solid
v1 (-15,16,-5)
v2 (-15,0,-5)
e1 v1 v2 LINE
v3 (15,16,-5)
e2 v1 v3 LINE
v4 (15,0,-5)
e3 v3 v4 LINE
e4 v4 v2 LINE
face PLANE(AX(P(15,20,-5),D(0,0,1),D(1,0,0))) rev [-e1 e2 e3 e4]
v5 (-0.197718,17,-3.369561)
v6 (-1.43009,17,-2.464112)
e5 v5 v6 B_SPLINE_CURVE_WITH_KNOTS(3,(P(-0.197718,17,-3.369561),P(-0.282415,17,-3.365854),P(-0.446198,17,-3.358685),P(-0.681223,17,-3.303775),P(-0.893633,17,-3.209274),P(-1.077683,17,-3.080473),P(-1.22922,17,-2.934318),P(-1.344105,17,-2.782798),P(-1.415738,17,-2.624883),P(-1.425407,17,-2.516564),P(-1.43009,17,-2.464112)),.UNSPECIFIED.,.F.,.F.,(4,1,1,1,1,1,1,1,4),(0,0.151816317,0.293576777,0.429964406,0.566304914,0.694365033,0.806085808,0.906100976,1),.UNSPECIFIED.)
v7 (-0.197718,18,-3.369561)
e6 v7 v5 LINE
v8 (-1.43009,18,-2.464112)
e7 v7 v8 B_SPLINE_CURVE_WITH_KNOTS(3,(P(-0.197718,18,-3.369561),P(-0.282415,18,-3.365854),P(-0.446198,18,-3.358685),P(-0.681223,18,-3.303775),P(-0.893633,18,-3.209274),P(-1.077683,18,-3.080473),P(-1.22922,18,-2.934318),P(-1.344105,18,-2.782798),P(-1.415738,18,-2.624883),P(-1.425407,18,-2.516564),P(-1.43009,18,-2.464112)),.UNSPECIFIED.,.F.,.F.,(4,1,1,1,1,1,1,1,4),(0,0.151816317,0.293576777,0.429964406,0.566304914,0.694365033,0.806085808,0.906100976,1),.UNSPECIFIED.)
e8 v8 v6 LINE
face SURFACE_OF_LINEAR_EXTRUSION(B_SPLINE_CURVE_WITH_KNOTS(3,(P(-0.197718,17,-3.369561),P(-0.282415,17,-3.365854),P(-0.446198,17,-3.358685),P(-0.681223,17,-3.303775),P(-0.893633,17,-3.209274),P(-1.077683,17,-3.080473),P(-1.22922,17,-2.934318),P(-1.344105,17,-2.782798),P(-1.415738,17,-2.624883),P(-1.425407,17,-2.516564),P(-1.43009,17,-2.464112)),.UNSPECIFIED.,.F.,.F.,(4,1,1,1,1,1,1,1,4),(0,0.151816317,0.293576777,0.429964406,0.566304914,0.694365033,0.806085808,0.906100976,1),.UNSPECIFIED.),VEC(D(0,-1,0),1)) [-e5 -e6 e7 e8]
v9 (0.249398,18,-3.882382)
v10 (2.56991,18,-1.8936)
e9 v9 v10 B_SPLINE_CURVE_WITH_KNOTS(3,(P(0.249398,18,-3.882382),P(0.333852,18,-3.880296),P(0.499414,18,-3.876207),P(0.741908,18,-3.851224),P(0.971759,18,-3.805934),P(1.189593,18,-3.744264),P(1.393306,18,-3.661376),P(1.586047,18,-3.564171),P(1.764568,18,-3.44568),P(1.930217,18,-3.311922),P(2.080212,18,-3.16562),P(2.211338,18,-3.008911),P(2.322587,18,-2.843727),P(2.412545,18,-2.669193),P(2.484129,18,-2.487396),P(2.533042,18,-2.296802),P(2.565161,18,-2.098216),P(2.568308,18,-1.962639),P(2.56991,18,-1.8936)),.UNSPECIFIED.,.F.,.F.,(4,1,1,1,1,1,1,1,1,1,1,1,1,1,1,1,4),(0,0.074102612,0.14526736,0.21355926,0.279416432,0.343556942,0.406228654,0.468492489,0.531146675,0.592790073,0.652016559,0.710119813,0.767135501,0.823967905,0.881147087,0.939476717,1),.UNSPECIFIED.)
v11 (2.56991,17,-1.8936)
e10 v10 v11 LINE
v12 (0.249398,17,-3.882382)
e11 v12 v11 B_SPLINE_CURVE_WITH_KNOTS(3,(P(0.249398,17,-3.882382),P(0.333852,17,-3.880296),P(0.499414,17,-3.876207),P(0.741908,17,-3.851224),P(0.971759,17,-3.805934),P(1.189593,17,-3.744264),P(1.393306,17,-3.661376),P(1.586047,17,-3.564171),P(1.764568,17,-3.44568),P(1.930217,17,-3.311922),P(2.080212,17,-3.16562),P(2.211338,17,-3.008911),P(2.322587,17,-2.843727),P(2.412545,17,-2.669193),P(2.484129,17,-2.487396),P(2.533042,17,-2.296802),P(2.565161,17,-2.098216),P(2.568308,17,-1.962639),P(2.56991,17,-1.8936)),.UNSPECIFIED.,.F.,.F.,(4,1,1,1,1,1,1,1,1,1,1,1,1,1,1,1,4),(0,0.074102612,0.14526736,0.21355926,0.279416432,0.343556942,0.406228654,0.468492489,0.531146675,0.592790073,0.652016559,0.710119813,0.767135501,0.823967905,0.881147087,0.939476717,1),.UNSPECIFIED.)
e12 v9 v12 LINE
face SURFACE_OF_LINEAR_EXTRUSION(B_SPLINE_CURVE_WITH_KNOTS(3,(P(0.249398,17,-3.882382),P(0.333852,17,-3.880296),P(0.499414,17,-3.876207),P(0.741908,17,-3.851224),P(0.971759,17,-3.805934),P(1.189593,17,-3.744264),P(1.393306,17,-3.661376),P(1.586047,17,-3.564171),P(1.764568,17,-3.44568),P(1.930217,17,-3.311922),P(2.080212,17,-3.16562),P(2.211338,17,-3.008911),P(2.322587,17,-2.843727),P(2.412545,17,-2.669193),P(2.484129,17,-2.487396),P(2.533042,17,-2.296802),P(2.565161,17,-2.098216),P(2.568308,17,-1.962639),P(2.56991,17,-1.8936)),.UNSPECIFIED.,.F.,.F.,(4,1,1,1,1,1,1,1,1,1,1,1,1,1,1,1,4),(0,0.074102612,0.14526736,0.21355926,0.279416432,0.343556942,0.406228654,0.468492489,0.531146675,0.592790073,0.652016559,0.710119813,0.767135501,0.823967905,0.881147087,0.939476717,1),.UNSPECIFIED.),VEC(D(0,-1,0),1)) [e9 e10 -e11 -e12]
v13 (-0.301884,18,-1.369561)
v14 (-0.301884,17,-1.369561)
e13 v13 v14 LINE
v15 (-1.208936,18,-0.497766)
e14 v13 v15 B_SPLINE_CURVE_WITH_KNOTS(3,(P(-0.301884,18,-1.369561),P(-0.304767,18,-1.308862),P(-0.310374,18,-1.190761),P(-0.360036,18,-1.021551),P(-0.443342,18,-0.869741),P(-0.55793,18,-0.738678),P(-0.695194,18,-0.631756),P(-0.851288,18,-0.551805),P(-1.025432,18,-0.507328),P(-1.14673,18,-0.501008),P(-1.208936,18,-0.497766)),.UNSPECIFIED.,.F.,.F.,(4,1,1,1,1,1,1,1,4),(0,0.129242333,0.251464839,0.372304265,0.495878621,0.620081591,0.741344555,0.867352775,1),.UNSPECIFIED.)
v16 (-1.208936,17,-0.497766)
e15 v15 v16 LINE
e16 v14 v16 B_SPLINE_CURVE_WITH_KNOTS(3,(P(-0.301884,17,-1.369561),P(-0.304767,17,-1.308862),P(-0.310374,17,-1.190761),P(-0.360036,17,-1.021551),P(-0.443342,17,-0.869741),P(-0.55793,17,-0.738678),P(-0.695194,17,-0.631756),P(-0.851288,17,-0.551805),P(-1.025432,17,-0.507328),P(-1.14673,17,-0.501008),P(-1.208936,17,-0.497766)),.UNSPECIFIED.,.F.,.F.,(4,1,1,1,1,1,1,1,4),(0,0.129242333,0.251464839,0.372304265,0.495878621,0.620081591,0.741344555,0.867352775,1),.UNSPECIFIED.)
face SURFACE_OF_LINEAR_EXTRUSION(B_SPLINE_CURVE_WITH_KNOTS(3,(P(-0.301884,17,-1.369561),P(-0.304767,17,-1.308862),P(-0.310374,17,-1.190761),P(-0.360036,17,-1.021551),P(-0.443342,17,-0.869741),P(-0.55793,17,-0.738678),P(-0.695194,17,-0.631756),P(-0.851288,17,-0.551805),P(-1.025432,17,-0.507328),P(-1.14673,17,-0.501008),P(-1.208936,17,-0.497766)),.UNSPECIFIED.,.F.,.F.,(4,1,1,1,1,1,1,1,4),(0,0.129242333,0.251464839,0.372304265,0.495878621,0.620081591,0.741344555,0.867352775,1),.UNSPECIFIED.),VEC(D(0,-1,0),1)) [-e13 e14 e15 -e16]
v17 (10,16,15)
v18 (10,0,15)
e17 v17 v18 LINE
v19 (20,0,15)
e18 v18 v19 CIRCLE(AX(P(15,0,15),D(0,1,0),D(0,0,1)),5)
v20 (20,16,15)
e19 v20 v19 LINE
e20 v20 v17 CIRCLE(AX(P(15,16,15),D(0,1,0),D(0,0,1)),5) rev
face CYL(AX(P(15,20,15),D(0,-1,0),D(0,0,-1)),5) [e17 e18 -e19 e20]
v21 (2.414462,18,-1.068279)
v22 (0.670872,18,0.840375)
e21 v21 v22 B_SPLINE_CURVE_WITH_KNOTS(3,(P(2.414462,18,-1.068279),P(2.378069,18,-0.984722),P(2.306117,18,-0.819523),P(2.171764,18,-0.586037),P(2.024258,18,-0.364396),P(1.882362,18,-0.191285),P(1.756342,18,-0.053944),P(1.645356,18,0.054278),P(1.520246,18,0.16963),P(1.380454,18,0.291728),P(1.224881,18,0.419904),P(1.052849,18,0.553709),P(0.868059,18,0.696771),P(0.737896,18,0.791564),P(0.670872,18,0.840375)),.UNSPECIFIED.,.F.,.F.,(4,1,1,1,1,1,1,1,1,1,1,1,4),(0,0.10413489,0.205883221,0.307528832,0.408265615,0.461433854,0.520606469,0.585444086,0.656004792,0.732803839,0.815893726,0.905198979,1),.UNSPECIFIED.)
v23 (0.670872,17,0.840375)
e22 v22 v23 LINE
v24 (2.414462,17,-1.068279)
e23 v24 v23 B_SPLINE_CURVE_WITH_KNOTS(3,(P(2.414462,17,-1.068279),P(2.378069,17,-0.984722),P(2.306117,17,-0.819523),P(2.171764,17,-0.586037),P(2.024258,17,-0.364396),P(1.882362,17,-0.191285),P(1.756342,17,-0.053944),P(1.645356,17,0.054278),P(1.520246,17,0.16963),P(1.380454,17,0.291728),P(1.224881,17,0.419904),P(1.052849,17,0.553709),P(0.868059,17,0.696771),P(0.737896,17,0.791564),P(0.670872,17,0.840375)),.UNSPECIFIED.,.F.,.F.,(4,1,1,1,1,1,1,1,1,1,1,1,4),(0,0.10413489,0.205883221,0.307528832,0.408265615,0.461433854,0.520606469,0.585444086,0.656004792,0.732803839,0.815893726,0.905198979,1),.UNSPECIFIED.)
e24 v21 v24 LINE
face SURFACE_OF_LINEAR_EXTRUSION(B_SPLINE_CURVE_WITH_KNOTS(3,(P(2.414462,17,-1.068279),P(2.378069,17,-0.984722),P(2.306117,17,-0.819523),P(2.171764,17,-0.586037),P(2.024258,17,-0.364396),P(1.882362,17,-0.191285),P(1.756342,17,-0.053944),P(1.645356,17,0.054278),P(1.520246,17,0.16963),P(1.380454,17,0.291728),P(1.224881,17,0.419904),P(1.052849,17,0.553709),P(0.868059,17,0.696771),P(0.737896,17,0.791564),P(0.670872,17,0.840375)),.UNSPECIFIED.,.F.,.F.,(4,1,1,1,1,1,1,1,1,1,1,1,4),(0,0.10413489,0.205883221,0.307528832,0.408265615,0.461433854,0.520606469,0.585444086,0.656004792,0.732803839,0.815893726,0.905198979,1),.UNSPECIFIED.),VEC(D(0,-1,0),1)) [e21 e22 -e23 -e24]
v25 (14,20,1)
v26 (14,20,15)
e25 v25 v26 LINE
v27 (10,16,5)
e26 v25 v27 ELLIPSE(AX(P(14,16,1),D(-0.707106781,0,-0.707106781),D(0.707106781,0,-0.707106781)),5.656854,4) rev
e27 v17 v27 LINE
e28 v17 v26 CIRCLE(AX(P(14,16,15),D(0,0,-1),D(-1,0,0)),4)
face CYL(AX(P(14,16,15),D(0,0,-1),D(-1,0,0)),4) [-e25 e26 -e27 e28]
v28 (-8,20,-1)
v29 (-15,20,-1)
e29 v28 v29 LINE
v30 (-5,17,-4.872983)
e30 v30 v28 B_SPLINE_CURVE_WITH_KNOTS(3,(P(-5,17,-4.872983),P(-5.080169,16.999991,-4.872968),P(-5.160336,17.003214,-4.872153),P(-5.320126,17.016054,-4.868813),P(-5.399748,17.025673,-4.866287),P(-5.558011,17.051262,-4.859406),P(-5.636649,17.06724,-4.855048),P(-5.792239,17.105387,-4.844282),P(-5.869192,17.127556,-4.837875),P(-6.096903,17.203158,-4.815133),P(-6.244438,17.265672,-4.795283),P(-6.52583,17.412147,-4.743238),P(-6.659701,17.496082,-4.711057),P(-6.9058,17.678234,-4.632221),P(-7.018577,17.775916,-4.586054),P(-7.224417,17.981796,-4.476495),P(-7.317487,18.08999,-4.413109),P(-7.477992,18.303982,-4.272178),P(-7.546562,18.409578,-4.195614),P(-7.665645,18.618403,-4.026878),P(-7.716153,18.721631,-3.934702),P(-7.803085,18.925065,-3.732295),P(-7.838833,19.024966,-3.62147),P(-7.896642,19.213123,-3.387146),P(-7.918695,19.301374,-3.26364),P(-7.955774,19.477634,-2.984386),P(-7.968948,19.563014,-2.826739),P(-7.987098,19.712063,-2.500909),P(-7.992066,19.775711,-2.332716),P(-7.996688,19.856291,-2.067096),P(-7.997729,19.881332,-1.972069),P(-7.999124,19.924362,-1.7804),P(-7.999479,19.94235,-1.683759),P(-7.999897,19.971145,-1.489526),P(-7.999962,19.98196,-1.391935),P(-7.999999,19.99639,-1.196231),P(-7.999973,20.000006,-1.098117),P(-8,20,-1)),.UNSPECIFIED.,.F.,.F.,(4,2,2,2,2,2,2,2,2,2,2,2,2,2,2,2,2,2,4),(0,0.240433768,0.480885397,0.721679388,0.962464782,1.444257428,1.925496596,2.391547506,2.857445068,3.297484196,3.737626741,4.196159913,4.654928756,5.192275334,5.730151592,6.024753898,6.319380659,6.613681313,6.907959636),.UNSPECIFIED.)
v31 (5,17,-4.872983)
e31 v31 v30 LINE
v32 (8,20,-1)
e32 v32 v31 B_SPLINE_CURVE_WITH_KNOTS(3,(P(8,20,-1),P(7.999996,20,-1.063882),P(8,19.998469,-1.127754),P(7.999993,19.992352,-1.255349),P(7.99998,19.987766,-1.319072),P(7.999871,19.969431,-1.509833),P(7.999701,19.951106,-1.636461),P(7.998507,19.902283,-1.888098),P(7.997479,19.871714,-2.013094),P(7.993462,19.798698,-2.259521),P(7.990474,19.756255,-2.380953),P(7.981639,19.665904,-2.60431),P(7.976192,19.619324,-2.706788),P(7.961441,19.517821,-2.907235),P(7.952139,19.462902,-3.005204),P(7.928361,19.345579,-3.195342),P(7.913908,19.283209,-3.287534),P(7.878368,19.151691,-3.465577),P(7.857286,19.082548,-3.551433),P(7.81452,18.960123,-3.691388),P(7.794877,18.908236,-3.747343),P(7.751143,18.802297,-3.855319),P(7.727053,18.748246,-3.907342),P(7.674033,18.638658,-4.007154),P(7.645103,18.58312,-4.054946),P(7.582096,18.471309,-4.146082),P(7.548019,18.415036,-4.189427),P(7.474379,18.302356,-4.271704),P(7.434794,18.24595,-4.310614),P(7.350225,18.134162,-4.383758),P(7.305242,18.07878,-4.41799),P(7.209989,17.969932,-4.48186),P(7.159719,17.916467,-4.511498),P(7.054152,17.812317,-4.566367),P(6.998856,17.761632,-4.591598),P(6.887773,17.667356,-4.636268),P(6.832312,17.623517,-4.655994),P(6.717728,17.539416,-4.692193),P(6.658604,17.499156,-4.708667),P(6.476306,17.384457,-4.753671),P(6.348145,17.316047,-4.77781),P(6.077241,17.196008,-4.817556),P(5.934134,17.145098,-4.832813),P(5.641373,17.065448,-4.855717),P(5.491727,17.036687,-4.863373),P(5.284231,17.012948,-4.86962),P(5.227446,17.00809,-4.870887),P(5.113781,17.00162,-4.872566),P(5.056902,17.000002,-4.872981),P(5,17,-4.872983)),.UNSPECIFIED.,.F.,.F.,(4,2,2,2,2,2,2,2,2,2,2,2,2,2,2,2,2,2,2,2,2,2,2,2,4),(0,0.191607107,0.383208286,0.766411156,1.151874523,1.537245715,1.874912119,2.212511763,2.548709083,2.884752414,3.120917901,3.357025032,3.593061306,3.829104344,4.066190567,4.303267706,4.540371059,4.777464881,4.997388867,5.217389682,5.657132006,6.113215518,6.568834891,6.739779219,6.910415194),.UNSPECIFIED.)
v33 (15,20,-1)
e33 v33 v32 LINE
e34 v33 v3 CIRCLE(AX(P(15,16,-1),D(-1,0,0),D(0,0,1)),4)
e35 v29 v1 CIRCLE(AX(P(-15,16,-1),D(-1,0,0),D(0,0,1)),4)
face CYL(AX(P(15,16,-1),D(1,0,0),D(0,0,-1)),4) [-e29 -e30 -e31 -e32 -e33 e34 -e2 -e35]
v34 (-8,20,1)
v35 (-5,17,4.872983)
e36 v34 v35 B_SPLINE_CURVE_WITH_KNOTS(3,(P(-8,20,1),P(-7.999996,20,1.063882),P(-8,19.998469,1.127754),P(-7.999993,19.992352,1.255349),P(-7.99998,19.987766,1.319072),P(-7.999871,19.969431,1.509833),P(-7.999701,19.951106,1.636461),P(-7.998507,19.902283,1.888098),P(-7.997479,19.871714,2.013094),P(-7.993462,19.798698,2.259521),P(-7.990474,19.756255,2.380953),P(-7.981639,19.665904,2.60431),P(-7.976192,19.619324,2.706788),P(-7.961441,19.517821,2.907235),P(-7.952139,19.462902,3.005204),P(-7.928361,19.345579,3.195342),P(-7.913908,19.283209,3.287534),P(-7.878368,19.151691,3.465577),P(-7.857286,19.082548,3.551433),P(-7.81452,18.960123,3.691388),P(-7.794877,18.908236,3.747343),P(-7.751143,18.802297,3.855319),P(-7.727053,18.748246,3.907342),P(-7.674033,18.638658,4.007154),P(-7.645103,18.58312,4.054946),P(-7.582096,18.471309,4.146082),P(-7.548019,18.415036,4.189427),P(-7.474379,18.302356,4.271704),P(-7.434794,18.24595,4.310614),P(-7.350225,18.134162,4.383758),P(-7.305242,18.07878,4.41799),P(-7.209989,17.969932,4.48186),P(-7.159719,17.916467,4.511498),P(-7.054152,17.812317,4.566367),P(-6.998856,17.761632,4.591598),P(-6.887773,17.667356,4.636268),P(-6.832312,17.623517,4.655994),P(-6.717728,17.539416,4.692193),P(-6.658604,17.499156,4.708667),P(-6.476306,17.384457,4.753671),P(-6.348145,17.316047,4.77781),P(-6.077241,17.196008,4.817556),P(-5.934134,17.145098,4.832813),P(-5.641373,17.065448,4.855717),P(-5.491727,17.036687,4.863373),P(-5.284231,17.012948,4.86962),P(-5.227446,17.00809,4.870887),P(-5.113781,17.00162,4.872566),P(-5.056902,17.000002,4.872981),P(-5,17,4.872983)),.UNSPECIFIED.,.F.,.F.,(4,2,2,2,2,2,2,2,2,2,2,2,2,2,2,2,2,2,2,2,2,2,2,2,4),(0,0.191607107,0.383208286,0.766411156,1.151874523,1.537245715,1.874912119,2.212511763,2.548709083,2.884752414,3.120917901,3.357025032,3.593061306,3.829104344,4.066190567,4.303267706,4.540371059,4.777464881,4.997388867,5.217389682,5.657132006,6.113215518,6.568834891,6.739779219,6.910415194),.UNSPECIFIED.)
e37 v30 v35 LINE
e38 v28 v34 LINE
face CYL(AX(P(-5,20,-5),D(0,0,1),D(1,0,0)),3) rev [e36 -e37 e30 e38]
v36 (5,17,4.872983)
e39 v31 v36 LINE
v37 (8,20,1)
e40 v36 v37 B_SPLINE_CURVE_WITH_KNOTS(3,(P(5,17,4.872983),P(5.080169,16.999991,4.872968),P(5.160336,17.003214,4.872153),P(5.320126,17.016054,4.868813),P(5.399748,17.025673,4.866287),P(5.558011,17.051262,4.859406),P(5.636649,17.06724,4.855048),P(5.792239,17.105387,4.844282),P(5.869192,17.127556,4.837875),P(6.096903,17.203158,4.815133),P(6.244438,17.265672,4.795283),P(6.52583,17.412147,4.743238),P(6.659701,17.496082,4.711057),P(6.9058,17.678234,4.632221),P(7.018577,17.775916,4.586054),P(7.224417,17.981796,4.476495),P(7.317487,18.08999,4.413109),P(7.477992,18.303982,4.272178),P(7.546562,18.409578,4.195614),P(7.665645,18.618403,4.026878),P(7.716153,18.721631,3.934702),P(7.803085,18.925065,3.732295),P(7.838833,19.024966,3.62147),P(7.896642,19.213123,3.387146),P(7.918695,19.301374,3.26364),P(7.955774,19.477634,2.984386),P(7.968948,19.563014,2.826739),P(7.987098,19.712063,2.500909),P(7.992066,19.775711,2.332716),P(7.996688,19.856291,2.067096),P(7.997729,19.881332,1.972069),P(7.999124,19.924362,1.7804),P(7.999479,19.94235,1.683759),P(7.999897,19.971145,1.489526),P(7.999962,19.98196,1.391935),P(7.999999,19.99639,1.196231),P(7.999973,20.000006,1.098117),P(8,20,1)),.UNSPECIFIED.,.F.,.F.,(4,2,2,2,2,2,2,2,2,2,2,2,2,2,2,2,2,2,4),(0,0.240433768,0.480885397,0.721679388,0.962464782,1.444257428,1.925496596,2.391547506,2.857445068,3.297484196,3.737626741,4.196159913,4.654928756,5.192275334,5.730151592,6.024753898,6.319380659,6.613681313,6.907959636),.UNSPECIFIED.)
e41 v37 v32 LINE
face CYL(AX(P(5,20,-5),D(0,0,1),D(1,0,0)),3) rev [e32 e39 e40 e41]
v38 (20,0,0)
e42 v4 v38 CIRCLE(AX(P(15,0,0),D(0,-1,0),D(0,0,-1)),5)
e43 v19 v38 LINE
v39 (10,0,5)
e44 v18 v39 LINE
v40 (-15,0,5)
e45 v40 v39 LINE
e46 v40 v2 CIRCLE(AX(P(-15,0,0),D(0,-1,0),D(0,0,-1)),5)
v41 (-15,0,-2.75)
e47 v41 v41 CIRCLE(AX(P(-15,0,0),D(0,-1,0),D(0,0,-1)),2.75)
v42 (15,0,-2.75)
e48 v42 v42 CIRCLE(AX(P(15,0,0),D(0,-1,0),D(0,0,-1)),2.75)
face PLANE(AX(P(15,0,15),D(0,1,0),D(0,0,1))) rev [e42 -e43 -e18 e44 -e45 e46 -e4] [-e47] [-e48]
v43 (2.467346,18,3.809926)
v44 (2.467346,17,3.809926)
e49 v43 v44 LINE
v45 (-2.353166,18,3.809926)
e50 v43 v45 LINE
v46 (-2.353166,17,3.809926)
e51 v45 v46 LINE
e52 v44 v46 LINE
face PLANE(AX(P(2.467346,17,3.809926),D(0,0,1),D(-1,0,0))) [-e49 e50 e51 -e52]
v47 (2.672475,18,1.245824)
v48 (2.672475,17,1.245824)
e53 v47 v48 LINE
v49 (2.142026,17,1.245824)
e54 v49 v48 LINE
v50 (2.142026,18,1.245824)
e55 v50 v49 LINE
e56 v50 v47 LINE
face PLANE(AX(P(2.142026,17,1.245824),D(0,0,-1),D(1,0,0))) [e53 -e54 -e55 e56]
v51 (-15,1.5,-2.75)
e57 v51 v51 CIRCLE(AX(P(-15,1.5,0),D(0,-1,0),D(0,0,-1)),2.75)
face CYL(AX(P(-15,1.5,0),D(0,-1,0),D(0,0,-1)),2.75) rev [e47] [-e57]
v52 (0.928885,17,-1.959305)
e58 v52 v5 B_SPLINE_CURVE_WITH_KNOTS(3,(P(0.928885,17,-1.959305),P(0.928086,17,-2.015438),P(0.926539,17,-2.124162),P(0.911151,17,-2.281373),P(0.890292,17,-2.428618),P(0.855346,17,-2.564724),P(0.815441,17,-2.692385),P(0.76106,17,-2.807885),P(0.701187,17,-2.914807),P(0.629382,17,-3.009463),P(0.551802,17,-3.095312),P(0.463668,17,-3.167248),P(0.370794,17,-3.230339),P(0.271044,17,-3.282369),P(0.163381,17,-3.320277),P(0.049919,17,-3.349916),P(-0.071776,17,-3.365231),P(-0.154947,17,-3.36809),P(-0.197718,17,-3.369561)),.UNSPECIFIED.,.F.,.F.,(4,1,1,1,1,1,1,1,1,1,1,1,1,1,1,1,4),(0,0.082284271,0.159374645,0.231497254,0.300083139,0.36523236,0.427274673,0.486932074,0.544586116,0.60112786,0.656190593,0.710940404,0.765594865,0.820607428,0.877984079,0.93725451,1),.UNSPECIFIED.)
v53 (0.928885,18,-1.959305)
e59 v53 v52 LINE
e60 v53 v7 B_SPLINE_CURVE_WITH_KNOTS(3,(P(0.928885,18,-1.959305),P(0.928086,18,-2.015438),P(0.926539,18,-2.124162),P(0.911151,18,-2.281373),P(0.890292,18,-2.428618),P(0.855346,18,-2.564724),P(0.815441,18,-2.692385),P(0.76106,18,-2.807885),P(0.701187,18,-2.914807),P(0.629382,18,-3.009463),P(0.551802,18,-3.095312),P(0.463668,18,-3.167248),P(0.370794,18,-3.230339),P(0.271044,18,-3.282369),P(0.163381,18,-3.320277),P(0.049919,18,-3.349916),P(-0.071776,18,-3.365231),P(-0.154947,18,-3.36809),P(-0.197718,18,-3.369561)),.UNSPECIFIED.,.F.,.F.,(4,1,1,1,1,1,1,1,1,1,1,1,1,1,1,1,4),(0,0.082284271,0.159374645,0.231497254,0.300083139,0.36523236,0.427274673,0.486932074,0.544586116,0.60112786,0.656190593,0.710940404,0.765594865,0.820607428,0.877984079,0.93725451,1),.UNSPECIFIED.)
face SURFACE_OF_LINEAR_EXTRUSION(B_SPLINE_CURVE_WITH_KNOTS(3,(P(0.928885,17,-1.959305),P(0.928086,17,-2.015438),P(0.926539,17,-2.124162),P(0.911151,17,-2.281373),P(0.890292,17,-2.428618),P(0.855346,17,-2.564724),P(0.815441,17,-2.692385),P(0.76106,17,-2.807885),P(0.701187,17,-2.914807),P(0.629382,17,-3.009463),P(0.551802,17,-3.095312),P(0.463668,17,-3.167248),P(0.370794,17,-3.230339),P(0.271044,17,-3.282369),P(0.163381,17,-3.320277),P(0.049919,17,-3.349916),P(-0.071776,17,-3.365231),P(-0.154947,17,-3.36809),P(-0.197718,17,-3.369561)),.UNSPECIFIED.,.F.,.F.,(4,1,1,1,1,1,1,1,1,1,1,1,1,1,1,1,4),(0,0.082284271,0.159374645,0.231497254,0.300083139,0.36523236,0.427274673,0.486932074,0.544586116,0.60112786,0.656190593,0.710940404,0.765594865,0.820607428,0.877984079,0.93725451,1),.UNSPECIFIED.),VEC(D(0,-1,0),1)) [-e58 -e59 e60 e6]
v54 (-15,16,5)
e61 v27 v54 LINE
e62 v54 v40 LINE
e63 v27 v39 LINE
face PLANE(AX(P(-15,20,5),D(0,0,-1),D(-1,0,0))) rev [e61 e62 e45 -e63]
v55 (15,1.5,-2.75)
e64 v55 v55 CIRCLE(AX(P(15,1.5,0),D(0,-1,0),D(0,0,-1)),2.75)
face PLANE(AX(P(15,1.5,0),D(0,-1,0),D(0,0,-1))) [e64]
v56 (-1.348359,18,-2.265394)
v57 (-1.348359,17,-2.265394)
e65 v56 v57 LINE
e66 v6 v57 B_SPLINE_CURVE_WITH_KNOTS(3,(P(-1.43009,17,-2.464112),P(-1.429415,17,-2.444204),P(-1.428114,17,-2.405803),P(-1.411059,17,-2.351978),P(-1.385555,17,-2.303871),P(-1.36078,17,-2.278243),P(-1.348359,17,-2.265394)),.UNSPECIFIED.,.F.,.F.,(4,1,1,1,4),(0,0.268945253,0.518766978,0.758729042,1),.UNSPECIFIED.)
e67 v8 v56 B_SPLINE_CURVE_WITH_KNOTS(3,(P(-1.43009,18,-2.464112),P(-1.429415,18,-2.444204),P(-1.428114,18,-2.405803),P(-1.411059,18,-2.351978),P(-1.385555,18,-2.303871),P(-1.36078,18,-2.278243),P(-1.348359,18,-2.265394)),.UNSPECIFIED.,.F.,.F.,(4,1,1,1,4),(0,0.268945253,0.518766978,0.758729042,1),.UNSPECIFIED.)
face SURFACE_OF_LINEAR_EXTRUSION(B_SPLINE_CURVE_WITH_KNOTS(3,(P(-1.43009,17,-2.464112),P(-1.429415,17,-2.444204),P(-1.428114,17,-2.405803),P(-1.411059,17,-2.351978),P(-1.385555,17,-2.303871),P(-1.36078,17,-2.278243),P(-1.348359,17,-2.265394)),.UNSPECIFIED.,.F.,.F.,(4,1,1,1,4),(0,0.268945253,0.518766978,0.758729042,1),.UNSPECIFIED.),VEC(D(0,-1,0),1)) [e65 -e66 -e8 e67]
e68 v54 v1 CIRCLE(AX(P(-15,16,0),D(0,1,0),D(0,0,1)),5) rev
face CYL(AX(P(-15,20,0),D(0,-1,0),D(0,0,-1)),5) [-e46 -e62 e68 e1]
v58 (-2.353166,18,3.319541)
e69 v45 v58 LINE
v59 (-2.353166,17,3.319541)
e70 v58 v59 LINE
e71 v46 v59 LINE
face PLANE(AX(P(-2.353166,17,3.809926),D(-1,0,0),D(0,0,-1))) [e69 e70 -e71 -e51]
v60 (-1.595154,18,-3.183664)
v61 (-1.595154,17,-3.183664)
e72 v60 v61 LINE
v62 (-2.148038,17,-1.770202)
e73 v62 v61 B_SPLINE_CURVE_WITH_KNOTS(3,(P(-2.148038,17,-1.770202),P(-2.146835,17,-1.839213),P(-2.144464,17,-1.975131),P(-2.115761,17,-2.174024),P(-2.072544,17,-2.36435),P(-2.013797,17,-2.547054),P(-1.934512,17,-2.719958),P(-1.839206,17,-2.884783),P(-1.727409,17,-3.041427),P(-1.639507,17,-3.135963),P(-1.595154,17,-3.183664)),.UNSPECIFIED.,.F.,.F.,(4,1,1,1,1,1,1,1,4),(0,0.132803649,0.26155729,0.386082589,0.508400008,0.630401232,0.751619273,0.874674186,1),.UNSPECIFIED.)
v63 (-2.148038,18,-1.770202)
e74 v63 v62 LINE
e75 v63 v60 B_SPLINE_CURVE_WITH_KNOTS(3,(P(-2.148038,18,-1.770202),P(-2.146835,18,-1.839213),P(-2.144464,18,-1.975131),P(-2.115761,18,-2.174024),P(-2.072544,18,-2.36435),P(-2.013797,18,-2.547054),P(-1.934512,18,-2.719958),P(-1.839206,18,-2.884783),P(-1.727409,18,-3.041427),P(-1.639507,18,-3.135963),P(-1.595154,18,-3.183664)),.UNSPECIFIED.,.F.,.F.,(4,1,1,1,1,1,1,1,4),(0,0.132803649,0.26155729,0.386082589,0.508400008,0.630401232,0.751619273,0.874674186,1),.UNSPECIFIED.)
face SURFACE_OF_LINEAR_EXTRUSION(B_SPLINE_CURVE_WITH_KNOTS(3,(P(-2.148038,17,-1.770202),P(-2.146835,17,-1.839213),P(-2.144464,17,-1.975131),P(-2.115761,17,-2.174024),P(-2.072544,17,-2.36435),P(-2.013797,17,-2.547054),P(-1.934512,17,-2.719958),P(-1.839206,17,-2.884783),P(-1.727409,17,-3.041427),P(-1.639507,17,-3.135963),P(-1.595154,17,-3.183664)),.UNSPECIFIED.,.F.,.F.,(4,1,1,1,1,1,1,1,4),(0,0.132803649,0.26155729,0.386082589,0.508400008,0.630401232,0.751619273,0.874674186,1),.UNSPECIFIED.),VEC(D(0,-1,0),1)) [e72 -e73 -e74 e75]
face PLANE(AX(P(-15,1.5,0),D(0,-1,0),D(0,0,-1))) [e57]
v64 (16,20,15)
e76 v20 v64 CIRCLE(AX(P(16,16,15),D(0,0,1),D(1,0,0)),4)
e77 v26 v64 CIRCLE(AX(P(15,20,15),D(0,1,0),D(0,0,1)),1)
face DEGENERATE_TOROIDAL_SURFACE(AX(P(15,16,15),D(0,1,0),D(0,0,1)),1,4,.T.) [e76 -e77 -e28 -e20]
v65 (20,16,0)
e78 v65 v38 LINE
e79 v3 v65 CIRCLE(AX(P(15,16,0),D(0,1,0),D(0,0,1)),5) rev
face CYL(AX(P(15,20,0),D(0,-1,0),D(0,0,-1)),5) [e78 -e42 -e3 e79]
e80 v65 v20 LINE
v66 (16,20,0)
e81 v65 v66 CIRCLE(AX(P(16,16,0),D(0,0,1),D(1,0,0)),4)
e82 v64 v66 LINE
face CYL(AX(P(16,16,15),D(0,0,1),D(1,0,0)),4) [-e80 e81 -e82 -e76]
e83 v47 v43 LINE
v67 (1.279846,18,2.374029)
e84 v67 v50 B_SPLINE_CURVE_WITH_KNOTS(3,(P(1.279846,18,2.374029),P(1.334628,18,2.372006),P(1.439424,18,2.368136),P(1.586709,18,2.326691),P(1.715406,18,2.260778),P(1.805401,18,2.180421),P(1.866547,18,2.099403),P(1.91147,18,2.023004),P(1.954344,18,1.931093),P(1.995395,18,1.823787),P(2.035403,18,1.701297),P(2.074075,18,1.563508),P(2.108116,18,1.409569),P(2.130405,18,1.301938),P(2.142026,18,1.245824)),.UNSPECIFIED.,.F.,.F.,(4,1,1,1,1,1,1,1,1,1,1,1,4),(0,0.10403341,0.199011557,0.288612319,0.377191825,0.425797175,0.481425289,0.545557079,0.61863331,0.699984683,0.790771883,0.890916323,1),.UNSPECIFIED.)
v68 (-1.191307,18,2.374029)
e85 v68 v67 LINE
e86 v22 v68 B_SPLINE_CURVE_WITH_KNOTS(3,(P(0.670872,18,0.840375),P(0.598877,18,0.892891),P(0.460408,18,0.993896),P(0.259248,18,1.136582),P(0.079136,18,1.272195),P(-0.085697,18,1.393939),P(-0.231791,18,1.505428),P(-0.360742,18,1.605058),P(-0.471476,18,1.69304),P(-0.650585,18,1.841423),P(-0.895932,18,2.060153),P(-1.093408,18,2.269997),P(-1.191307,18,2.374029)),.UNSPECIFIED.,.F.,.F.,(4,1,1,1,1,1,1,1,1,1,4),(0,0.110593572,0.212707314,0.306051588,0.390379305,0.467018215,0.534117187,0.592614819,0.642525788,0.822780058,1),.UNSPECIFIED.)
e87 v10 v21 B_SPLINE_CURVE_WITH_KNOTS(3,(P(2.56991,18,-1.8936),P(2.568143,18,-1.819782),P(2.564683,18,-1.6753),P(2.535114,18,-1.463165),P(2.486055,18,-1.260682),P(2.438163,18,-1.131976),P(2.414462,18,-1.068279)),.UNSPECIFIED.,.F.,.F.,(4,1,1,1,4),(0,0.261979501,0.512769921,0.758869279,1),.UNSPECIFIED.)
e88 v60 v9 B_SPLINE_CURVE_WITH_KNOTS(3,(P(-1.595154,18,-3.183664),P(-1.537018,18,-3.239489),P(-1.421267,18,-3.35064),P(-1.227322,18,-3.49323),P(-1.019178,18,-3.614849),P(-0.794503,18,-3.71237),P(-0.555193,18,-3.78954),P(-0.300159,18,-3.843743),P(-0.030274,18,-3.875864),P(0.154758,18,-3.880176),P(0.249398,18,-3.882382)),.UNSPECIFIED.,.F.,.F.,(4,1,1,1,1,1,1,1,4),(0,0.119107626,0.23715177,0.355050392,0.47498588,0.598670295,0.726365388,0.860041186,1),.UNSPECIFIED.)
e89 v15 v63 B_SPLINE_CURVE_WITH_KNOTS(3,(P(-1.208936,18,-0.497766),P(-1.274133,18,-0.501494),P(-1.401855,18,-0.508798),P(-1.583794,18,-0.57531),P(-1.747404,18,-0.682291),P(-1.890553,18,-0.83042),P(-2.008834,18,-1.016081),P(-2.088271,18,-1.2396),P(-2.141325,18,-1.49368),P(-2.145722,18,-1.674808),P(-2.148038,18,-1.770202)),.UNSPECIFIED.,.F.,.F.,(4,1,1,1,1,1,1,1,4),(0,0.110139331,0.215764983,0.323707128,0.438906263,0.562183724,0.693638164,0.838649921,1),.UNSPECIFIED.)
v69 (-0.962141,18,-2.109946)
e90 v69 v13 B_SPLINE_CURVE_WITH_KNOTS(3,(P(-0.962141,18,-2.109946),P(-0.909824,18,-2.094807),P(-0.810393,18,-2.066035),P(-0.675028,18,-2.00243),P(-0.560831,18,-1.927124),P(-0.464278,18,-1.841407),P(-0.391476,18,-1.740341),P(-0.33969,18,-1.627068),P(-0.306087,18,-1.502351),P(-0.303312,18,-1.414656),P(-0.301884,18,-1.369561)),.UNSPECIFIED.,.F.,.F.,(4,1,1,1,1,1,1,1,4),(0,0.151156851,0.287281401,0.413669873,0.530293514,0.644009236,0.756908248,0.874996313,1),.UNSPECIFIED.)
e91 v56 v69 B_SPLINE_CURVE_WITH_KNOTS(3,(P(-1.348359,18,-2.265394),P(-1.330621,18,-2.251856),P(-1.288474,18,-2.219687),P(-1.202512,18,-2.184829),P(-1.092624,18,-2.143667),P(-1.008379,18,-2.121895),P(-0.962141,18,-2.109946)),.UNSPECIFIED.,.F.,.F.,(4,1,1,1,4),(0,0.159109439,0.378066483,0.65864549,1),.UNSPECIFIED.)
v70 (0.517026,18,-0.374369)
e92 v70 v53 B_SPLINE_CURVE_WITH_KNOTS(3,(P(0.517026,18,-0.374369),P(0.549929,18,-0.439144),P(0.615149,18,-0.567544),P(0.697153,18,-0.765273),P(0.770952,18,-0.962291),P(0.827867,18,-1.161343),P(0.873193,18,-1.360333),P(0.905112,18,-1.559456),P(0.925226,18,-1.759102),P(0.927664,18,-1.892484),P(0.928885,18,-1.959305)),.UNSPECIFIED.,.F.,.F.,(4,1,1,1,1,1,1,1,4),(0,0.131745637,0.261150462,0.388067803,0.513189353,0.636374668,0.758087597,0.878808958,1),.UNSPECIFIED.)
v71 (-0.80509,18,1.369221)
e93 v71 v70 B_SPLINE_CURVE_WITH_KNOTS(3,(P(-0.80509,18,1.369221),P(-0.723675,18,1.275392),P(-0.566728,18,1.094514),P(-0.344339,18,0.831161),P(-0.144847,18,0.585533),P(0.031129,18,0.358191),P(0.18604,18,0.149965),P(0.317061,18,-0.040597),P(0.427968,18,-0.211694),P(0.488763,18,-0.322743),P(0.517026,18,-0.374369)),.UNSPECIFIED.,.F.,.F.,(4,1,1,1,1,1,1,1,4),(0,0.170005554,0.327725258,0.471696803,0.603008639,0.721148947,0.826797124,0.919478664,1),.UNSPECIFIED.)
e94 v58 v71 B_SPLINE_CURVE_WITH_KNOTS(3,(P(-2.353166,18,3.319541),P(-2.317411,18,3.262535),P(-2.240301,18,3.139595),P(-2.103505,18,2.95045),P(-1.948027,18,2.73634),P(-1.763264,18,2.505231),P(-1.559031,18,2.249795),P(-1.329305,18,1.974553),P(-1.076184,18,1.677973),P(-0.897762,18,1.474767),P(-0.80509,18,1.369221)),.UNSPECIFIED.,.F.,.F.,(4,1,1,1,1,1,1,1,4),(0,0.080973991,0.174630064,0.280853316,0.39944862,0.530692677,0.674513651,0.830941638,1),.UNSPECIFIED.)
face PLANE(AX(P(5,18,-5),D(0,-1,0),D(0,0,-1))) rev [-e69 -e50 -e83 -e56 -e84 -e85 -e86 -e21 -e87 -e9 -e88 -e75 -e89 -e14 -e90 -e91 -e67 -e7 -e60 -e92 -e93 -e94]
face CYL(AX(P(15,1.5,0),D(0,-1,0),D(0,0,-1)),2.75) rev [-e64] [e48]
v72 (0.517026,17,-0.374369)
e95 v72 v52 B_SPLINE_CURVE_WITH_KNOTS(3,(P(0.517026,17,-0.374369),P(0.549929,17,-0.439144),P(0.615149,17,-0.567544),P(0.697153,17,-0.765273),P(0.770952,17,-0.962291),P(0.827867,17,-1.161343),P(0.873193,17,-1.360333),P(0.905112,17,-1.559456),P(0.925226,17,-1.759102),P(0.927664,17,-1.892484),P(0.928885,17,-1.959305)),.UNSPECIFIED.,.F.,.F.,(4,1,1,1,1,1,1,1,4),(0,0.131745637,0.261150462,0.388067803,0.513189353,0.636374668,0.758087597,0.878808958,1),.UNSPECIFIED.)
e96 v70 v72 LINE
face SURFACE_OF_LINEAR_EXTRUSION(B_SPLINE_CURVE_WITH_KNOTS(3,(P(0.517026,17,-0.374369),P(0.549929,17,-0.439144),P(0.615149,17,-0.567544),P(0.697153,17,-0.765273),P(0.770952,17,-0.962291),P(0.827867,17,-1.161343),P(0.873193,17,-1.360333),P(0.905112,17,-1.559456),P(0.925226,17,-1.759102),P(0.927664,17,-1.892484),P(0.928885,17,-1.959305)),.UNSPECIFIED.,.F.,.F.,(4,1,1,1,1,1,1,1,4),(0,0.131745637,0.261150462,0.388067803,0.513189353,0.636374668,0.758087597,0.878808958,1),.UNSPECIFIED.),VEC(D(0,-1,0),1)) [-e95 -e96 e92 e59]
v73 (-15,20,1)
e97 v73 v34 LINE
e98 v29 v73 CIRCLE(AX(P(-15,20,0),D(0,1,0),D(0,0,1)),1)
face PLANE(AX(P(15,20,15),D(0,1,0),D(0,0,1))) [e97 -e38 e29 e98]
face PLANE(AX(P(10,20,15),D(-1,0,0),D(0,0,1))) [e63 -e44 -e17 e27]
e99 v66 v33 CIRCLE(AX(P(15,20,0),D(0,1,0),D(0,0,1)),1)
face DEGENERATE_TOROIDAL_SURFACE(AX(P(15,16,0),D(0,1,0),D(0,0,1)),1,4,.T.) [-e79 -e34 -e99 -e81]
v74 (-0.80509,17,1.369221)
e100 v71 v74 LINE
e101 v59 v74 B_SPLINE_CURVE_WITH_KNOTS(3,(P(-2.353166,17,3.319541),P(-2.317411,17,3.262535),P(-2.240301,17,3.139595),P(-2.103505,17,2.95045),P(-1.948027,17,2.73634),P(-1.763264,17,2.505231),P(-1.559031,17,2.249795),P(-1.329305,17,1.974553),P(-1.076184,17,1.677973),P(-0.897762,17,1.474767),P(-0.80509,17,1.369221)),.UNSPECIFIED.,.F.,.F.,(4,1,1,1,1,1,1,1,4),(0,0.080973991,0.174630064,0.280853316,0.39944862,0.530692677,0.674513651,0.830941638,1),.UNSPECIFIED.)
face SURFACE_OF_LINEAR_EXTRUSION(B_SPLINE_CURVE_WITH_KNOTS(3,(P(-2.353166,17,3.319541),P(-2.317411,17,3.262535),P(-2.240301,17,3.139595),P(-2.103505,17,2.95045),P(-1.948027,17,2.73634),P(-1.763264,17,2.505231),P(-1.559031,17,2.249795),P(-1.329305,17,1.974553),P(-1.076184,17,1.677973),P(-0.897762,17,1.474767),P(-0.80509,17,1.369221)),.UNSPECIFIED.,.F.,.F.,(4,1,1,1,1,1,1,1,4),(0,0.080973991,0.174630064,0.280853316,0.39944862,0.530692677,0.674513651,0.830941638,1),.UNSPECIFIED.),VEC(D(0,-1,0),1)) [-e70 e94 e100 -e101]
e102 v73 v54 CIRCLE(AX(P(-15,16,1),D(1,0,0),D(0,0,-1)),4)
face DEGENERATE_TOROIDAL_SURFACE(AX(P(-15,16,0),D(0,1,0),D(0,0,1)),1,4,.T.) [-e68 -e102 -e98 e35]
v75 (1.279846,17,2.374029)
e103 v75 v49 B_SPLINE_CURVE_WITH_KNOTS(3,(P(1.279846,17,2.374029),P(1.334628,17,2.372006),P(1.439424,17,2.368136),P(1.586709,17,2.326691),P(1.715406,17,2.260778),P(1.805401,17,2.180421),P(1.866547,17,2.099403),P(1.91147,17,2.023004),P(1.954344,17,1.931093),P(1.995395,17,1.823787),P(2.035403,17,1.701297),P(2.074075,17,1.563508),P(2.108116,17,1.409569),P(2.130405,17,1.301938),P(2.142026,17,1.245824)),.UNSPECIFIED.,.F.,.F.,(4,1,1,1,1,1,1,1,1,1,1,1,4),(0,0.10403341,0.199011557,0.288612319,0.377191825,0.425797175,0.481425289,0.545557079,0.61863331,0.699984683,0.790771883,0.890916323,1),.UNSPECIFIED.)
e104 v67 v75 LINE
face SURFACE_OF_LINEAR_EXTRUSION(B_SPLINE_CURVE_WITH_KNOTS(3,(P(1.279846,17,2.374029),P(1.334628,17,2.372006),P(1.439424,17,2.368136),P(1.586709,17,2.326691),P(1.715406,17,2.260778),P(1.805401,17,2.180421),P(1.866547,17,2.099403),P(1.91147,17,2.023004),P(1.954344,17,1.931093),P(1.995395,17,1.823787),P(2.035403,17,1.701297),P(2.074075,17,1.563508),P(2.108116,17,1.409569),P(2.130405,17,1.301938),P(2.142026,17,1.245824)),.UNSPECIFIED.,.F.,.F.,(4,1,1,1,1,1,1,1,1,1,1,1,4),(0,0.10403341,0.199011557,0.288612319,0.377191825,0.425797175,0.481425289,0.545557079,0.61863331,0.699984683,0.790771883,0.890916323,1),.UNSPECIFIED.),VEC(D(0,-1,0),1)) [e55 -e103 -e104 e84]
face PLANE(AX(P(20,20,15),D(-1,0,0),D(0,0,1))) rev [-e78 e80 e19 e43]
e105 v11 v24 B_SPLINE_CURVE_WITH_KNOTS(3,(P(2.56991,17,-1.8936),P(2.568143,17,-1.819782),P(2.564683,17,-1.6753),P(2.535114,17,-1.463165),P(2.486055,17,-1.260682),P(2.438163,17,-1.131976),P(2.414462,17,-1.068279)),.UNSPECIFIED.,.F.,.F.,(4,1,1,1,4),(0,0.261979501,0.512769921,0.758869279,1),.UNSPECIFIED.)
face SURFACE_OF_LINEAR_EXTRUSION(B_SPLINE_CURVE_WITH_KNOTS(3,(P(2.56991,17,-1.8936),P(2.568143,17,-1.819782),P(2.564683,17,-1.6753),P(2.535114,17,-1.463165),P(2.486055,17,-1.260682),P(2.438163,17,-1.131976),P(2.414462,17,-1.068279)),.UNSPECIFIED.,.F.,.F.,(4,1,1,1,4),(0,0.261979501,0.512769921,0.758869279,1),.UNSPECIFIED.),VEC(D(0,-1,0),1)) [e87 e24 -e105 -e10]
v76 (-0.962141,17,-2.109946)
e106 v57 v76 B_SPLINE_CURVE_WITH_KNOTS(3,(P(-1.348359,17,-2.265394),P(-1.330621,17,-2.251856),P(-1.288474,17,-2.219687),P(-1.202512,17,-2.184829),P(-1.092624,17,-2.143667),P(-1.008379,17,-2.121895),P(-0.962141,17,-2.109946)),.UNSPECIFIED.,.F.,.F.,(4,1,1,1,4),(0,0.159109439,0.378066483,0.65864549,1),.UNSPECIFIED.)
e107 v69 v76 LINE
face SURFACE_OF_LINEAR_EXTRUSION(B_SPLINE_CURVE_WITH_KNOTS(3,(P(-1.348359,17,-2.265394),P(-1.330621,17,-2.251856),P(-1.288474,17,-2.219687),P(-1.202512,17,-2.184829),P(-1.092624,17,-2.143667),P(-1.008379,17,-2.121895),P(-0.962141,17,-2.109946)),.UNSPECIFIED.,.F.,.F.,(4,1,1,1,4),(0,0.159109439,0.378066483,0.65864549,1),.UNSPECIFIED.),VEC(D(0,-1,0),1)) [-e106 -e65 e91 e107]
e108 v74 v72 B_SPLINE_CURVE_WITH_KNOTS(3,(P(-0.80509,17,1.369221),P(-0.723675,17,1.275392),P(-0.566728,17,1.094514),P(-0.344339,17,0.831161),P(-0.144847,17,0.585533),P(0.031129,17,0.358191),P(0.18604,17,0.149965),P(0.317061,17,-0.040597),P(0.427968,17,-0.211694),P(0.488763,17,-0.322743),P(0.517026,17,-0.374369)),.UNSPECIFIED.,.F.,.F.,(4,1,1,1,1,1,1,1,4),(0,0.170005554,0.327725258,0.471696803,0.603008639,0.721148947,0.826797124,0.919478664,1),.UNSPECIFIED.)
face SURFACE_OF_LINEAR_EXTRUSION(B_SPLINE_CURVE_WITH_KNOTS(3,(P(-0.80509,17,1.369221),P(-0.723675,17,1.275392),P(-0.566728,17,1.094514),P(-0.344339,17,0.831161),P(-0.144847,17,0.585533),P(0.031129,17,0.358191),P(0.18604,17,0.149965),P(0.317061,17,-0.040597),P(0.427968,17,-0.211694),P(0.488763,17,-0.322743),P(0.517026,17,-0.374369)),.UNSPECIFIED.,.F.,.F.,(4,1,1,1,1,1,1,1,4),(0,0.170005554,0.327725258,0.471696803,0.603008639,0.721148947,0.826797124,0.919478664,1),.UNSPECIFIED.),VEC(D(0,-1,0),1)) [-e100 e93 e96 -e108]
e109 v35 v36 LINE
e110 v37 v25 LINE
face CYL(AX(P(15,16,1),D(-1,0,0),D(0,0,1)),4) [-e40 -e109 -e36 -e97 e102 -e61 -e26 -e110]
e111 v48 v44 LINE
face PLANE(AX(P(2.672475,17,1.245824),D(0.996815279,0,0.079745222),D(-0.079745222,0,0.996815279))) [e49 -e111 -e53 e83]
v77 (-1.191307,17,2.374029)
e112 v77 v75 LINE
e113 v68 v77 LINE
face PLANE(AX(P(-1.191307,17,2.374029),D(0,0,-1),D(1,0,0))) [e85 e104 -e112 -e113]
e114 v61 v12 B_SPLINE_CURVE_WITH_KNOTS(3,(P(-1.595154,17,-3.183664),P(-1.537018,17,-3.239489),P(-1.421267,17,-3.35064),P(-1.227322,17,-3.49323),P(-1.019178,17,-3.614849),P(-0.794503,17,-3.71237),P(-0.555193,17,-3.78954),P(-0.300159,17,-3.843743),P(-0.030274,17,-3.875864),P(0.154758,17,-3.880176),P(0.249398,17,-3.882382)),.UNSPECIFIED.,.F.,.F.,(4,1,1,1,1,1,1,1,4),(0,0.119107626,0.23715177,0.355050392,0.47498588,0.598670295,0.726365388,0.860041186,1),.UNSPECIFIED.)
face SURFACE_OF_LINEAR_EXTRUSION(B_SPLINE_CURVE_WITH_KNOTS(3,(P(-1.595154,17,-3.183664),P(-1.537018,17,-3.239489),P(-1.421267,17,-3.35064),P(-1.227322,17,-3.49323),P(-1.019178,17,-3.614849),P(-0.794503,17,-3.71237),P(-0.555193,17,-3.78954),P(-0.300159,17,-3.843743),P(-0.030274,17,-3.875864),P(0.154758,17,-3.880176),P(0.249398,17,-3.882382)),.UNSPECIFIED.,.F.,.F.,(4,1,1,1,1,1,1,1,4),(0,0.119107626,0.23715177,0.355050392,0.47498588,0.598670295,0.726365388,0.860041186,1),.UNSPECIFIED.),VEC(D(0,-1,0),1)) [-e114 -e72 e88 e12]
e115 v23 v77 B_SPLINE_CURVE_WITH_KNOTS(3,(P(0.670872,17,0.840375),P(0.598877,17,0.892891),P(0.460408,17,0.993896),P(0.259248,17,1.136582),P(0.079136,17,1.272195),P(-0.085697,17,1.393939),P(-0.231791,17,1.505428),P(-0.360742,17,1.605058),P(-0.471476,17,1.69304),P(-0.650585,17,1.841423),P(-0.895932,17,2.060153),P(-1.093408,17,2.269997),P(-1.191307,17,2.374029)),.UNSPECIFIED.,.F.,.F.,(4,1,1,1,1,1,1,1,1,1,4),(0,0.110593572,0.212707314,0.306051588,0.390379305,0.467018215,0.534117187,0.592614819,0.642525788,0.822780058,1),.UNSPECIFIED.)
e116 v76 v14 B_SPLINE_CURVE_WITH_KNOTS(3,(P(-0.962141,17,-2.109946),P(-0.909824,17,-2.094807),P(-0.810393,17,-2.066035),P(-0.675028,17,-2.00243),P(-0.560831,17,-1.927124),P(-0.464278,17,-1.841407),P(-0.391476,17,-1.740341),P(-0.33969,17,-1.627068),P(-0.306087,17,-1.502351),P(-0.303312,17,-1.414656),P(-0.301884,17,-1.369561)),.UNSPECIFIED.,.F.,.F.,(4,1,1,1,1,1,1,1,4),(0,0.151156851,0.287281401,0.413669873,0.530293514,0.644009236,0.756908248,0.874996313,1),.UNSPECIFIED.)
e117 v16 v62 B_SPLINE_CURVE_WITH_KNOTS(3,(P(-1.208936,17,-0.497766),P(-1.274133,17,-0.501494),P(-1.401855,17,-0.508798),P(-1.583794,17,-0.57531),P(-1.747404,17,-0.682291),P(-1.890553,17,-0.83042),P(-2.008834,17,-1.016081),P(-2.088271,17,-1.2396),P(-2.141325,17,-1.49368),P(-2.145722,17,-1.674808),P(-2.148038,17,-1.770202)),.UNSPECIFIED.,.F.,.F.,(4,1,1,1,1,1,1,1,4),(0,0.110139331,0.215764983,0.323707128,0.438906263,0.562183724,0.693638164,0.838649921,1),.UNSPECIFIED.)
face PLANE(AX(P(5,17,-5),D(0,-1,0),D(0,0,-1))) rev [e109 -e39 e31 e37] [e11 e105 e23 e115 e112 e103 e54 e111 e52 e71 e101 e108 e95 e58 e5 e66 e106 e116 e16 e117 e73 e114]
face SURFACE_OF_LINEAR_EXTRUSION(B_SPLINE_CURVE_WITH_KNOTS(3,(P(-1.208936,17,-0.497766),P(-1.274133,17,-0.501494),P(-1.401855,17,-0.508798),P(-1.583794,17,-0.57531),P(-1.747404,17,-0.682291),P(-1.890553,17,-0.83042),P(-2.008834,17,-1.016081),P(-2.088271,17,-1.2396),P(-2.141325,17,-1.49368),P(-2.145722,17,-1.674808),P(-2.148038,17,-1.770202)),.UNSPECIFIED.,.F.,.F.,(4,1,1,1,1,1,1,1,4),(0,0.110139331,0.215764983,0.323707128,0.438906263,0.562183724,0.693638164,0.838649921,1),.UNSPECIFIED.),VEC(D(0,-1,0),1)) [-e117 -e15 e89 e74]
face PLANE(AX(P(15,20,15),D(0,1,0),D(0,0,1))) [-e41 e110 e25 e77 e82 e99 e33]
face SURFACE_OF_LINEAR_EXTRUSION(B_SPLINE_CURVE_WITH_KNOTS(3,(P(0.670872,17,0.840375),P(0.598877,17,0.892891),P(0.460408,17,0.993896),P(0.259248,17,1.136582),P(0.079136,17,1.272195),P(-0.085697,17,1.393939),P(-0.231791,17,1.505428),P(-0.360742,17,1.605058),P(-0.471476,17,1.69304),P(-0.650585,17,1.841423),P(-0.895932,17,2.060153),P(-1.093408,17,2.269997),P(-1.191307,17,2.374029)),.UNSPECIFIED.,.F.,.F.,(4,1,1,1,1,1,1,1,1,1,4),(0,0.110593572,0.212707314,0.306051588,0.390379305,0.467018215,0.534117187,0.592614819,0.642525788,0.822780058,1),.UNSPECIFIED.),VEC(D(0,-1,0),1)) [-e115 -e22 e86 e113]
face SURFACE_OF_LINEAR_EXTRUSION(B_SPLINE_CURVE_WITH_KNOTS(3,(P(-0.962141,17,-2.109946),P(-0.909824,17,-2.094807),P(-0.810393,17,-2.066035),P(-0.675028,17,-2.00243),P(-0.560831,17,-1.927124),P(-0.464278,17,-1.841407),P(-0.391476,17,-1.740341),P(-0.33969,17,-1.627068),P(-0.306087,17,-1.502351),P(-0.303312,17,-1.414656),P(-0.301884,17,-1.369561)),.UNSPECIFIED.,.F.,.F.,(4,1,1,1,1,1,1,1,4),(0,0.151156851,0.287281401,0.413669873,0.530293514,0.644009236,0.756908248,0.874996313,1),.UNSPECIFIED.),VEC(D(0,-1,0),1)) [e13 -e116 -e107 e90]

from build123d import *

# Parameters (mm, degrees)
BOSS_EXTRUDE1_DEPTH     = 20
FILLET1_R               = 4
SKETCH2_R               = 2.75
CUT_EXTRUDE1_DEPTH      = 1.5
LPATTERN1_COUNT         = 2
LPATTERN1_PITCH         = 30
CUT_EXTRUDE2_DEPTH      = 35.641016151
CUT_EXTRUDE2_DEPTH_BACK = 35.641016151
WRAP1_DEPTH             = 1


# Read off the part's stored shape, not the designer's step: Wrap1
with BuildPart() as part:
    # Sketch1 → Boss-Extrude1 (new body)
    with BuildSketch(Plane(origin=(0, 0, 0), x_dir=(1, 0, 0), z_dir=(0, 1, 0))):
        with BuildLine():
            Line((-15, -5), (10, -5))
            Line((10, -5), (10, -15))
            ThreePointArc((10, -15), (15, -20), (20, -15))
            Line((20, -15), (20, 0))
            ThreePointArc((20, 0), (18.535533906, 3.535533906), (15, 5))
            Line((15, 5), (-15, 5))
            ThreePointArc((-15, 5), (-20, 0), (-15, -5))
        make_face()
    extrude(amount=BOSS_EXTRUDE1_DEPTH)

    # Fillet1
    fillet1_edges = [part.edges().sort_by_distance(p)[0] for p in [
        (15, 20, 20),
        (20, 20, 7.5),
        (18.535533906, 20, -3.535533906),
        (0, 20, -5),
        (-20, 20, 0),
        (-2.5, 20, 5),
        (10, 20, 10),
    ]]
    fillet(fillet1_edges, radius=FILLET1_R)

    # Sketch2 → Cut-Extrude1 (cut)
    with BuildSketch(Plane.XZ):
        with Locations(Location((-15, 0, 0), (0, 0, 270))):
            Circle(SKETCH2_R)
    cut_extrude1 = extrude(amount=-CUT_EXTRUDE1_DEPTH, mode=Mode.SUBTRACT)

    # LPattern1: Cut-Extrude1 ×2
    with Locations(*[(i * LPATTERN1_PITCH, 0, 0) for i in range(1, LPATTERN1_COUNT)]):
        add(cut_extrude1, mode=Mode.SUBTRACT)

    # Sketch3 → Cut-Extrude2 (cut, two sides: drawn at the far end of the back side and taken through both)
    with BuildSketch(Plane.XY.offset(-CUT_EXTRUDE2_DEPTH_BACK)):
        with BuildLine():
            Line((5, 17), (-5, 17))
            ThreePointArc((-5, 17), (-8, 20), (-5, 23))
            Line((-5, 23), (5, 23))
            ThreePointArc((5, 23), (8, 20), (5, 17))
        make_face()
    extrude(amount=CUT_EXTRUDE2_DEPTH + CUT_EXTRUDE2_DEPTH_BACK, mode=Mode.SUBTRACT)

    # Wrap1 outline → Wrap1 (add)
    with BuildSketch(Plane(origin=(0, 17, 0), x_dir=(1, 0, 0), z_dir=(0, 1, 0))):
        with BuildLine():
            add(Edge.make_bspline(
                [(1.279846376, -2.374028678), (1.334628235, -2.372005919), (1.439423638, -2.368136466), (1.586709387, -2.326690884), (1.715405832, -2.260778282), (1.805401117, -2.180421216), (1.866547055, -2.099402851), (1.91146986, -2.023004422), (1.954343809, -1.931092566), (1.995394653, -1.823787438), (2.03540343, -1.701296934), (2.074075054, -1.563508285), (2.108116131, -1.409568974), (2.130405187, -1.301938193), (2.142025864, -1.245823549)],
                knots=[0, 0, 0, 0, 0.10403341, 0.199011557, 0.288612319, 0.377191825, 0.425797175, 0.481425289, 0.545557079, 0.61863331, 0.699984683, 0.790771883, 0.890916323, 1, 1, 1, 1], degree=3))
            Line((1.279846376, -2.374028678), (-1.19130747, -2.374028678))
            add(Edge.make_bspline(
                [(0.670872017, -0.840374831), (0.598877184, -0.892890897), (0.460407765, -0.993896327), (0.259247648, -1.136582046), (0.079136214, -1.2721954), (-0.085697103, -1.393939001), (-0.231791362, -1.50542791), (-0.360742391, -1.605057789), (-0.471476435, -1.693040171), (-0.650584686, -1.841423278), (-0.895932385, -2.060152678), (-1.093407848, -2.269997081), (-1.19130747, -2.374028678)],
                knots=[0, 0, 0, 0, 0.110593572, 0.212707314, 0.306051588, 0.390379305, 0.467018215, 0.534117187, 0.592614819, 0.642525788, 0.822780058, 1, 1, 1, 1], degree=3))
            add(Edge.make_bspline(
                [(2.414461761, 1.068279015), (2.378068935, 0.984722167), (2.306117333, 0.819523423), (2.171764082, 0.586037142), (2.024257932, 0.364395962), (1.882362056, 0.191285153), (1.756342108, 0.053944192), (1.645356158, -0.054277839), (1.52024596, -0.169630314), (1.380454268, -0.29172845), (1.224880603, -0.419904333), (1.052848506, -0.553709461), (0.868059484, -0.696771215), (0.737896342, -0.79156374), (0.670872017, -0.840374831)],
                knots=[0, 0, 0, 0, 0.10413489, 0.205883221, 0.307528832, 0.408265615, 0.461433854, 0.520606469, 0.585444086, 0.656004792, 0.732803839, 0.815893726, 0.905198979, 1, 1, 1, 1], degree=3))
            add(Edge.make_bspline(
                [(2.569910479, 1.893599528), (2.568142746, 1.81978224), (2.56468278, 1.675300383), (2.535113724, 1.46316539), (2.486055205, 1.260681768), (2.438163447, 1.131975763), (2.414461761, 1.068279015)],
                knots=[0, 0, 0, 0, 0.261979501, 0.512769921, 0.758869279, 1, 1, 1, 1], degree=3))
            add(Edge.make_bspline(
                [(0.249397658, 3.882381579), (0.333852401, 3.880295856), (0.499413602, 3.876207099), (0.741908223, 3.851223526), (0.971759136, 3.80593405), (1.18959295, 3.744264137), (1.393306246, 3.661376278), (1.586046869, 3.564171248), (1.76456817, 3.445680325), (1.930217215, 3.311921517), (2.08021151, 3.165619914), (2.21133761, 3.008910571), (2.322587283, 2.843726724), (2.412544984, 2.66919338), (2.484129314, 2.487396013), (2.533041577, 2.296802227), (2.565160525, 2.098215825), (2.568307798, 1.962639068), (2.569910479, 1.893599528)],
                knots=[0, 0, 0, 0, 0.074102612, 0.14526736, 0.21355926, 0.279416432, 0.343556942, 0.406228654, 0.468492489, 0.531146675, 0.592790073, 0.652016559, 0.710119813, 0.767135501, 0.823967905, 0.881147087, 0.939476717, 1, 1, 1, 1], degree=3))
            add(Edge.make_bspline(
                [(-1.595153624, 3.18366363), (-1.537018416, 3.239488538), (-1.421267077, 3.350639908), (-1.227322021, 3.49323037), (-1.01917847, 3.614849236), (-0.794503481, 3.712369576), (-0.555192573, 3.789539817), (-0.300158666, 3.843743016), (-0.03027423, 3.875864088), (0.154757504, 3.880176079), (0.249397658, 3.882381579)],
                knots=[0, 0, 0, 0, 0.119107626, 0.23715177, 0.355050392, 0.47498588, 0.598670295, 0.726365388, 0.860041186, 1, 1, 1, 1], degree=3))
            add(Edge.make_bspline(
                [(-2.148038239, 1.770202092), (-2.146834557, 1.839213319), (-2.1444639, 1.975131192), (-2.115761448, 2.174024084), (-2.0725438, 2.364349945), (-2.013797101, 2.547053872), (-1.93451202, 2.719957511), (-1.839205925, 2.884783326), (-1.727409324, 3.041427104), (-1.639506749, 3.135963346), (-1.595153624, 3.18366363)],
                knots=[0, 0, 0, 0, 0.132803649, 0.26155729, 0.386082589, 0.508400008, 0.630401232, 0.751619273, 0.874674186, 1, 1, 1, 1], degree=3))
            add(Edge.make_bspline(
                [(-1.208935675, 0.497766194), (-1.274132827, 0.50149434), (-1.401855252, 0.508797847), (-1.58379437, 0.575310486), (-1.747403804, 0.682290997), (-1.890553306, 0.830420443), (-2.008834141, 1.01608116), (-2.088271481, 1.239599951), (-2.141324633, 1.493680029), (-2.145722196, 1.674808207), (-2.148038239, 1.770202092)],
                knots=[0, 0, 0, 0, 0.110139331, 0.215764983, 0.323707128, 0.438906263, 0.562183724, 0.693638164, 0.838649921, 1, 1, 1, 1], degree=3))
            add(Edge.make_bspline(
                [(-0.301884393, 1.369561066), (-0.304766572, 1.30886225), (-0.310374385, 1.190761489), (-0.360035913, 1.021550791), (-0.443342029, 0.869740737), (-0.557930256, 0.738678363), (-0.695194398, 0.631756347), (-0.851287883, 0.551805139), (-1.025431534, 0.507328091), (-1.146729825, 0.50100757), (-1.208935675, 0.497766194)],
                knots=[0, 0, 0, 0, 0.129242333, 0.251464839, 0.372304265, 0.495878621, 0.620081591, 0.741344555, 0.867352775, 1, 1, 1, 1], degree=3))
            add(Edge.make_bspline(
                [(-0.962140803, 2.109945681), (-0.909824085, 2.094806974), (-0.81039346, 2.066035077), (-0.675027986, 2.002430367), (-0.560830979, 1.92712373), (-0.46427764, 1.841406615), (-0.391475884, 1.740340724), (-0.339690156, 1.627067557), (-0.306087178, 1.502350913), (-0.303311641, 1.414655948), (-0.301884393, 1.369561066)],
                knots=[0, 0, 0, 0, 0.151156851, 0.287281401, 0.413669873, 0.530293514, 0.644009236, 0.756908248, 0.874996313, 1, 1, 1, 1], degree=3))
            add(Edge.make_bspline(
                [(-1.348358752, 2.265394399), (-1.330621209, 2.251855949), (-1.288474303, 2.219686679), (-1.202511656, 2.184828621), (-1.092623552, 2.143667428), (-1.00837918, 2.121895451), (-0.962140803, 2.109945681)],
                knots=[0, 0, 0, 0, 0.159109439, 0.378066483, 0.65864549, 1, 1, 1, 1], degree=3))
            add(Edge.make_bspline(
                [(-1.430089521, 2.464112348), (-1.429415195, 2.444204185), (-1.428114492, 2.405803442), (-1.411058666, 2.351977791), (-1.385555484, 2.303870537), (-1.360780125, 2.278243013), (-1.348358752, 2.265394399)],
                knots=[0, 0, 0, 0, 0.268945253, 0.518766978, 0.758729042, 1, 1, 1, 1], degree=3))
            add(Edge.make_bspline(
                [(-0.197717726, 3.369561066), (-0.28241452, 3.365853817), (-0.446198046, 3.358684877), (-0.681222607, 3.303774927), (-0.893632691, 3.209273649), (-1.077682983, 3.0804735), (-1.229219898, 2.93431847), (-1.344105461, 2.782798304), (-1.415738038, 2.624883436), (-1.425407352, 2.516563894), (-1.430089521, 2.464112348)],
                knots=[0, 0, 0, 0, 0.151816317, 0.293576777, 0.429964406, 0.566304914, 0.694365033, 0.806085808, 0.906100976, 1, 1, 1, 1], degree=3))
            add(Edge.make_bspline(
                [(0.928884838, 1.959304656), (0.928086086, 2.015438052), (0.926539001, 2.124161628), (0.911151444, 2.281372808), (0.890291843, 2.428618132), (0.855346146, 2.564724047), (0.815441285, 2.692385245), (0.761060485, 2.807885158), (0.701186968, 2.914806673), (0.629381656, 3.009462922), (0.551801509, 3.095312), (0.463668068, 3.167247991), (0.370794497, 3.230338766), (0.271044111, 3.28236916), (0.163381009, 3.320276983), (0.04991907, 3.349915646), (-0.071775658, 3.365230608), (-0.154947449, 3.36809043), (-0.197717726, 3.369561066)],
                knots=[0, 0, 0, 0, 0.082284271, 0.159374645, 0.231497254, 0.300083139, 0.36523236, 0.427274673, 0.486932074, 0.544586116, 0.60112786, 0.656190593, 0.710940404, 0.765594865, 0.820607428, 0.877984079, 0.93725451, 1, 1, 1, 1], degree=3))
            add(Edge.make_bspline(
                [(0.517025864, 0.374368758), (0.549928586, 0.43914421), (0.615149426, 0.567544204), (0.697152899, 0.765273295), (0.770951673, 0.962291119), (0.827867417, 1.161343452), (0.873192914, 1.360332754), (0.905111682, 1.559455639), (0.92522592, 1.759102273), (0.927663621, 1.892484206), (0.928884838, 1.959304656)],
                knots=[0, 0, 0, 0, 0.131745637, 0.261150462, 0.388067803, 0.513189353, 0.636374668, 0.758087597, 0.878808958, 1, 1, 1, 1], degree=3))
            add(Edge.make_bspline(
                [(-0.805089521, -1.369220985), (-0.723674568, -1.275391825), (-0.566728304, -1.09451429), (-0.344338673, -0.83116064), (-0.144847313, -0.585533161), (0.031128622, -0.358191092), (0.186040311, -0.149965293), (0.317060652, 0.040597284), (0.427968481, 0.211694057), (0.488762816, 0.322742687), (0.517025864, 0.374368758)],
                knots=[0, 0, 0, 0, 0.170005554, 0.327725258, 0.471696803, 0.603008639, 0.721148947, 0.826797124, 0.919478664, 1, 1, 1, 1], degree=3))
            add(Edge.make_bspline(
                [(-2.353166444, -3.319541498), (-2.317411217, -3.262535334), (-2.240300808, -3.139594747), (-2.103504918, -2.950449774), (-1.948026633, -2.736340024), (-1.76326396, -2.505230848), (-1.559031147, -2.249795036), (-1.329305353, -1.9745526), (-1.076183846, -1.67797272), (-0.897762158, -1.474766675), (-0.805089521, -1.369220985)],
                knots=[0, 0, 0, 0, 0.080973991, 0.174630064, 0.280853316, 0.39944862, 0.530692677, 0.674513651, 0.830941638, 1, 1, 1, 1], degree=3))
            Line((-2.353166444, -3.319541498), (-2.353166444, -3.809926113))
            Line((-2.353166444, -3.809926113), (2.467346376, -3.809926113))
            Line((2.467346376, -3.809926113), (2.672474581, -1.245823549))
            Line((2.672474581, -1.245823549), (2.142025864, -1.245823549))
        make_face()
    extrude(amount=WRAP1_DEPTH)


solid = part.part
